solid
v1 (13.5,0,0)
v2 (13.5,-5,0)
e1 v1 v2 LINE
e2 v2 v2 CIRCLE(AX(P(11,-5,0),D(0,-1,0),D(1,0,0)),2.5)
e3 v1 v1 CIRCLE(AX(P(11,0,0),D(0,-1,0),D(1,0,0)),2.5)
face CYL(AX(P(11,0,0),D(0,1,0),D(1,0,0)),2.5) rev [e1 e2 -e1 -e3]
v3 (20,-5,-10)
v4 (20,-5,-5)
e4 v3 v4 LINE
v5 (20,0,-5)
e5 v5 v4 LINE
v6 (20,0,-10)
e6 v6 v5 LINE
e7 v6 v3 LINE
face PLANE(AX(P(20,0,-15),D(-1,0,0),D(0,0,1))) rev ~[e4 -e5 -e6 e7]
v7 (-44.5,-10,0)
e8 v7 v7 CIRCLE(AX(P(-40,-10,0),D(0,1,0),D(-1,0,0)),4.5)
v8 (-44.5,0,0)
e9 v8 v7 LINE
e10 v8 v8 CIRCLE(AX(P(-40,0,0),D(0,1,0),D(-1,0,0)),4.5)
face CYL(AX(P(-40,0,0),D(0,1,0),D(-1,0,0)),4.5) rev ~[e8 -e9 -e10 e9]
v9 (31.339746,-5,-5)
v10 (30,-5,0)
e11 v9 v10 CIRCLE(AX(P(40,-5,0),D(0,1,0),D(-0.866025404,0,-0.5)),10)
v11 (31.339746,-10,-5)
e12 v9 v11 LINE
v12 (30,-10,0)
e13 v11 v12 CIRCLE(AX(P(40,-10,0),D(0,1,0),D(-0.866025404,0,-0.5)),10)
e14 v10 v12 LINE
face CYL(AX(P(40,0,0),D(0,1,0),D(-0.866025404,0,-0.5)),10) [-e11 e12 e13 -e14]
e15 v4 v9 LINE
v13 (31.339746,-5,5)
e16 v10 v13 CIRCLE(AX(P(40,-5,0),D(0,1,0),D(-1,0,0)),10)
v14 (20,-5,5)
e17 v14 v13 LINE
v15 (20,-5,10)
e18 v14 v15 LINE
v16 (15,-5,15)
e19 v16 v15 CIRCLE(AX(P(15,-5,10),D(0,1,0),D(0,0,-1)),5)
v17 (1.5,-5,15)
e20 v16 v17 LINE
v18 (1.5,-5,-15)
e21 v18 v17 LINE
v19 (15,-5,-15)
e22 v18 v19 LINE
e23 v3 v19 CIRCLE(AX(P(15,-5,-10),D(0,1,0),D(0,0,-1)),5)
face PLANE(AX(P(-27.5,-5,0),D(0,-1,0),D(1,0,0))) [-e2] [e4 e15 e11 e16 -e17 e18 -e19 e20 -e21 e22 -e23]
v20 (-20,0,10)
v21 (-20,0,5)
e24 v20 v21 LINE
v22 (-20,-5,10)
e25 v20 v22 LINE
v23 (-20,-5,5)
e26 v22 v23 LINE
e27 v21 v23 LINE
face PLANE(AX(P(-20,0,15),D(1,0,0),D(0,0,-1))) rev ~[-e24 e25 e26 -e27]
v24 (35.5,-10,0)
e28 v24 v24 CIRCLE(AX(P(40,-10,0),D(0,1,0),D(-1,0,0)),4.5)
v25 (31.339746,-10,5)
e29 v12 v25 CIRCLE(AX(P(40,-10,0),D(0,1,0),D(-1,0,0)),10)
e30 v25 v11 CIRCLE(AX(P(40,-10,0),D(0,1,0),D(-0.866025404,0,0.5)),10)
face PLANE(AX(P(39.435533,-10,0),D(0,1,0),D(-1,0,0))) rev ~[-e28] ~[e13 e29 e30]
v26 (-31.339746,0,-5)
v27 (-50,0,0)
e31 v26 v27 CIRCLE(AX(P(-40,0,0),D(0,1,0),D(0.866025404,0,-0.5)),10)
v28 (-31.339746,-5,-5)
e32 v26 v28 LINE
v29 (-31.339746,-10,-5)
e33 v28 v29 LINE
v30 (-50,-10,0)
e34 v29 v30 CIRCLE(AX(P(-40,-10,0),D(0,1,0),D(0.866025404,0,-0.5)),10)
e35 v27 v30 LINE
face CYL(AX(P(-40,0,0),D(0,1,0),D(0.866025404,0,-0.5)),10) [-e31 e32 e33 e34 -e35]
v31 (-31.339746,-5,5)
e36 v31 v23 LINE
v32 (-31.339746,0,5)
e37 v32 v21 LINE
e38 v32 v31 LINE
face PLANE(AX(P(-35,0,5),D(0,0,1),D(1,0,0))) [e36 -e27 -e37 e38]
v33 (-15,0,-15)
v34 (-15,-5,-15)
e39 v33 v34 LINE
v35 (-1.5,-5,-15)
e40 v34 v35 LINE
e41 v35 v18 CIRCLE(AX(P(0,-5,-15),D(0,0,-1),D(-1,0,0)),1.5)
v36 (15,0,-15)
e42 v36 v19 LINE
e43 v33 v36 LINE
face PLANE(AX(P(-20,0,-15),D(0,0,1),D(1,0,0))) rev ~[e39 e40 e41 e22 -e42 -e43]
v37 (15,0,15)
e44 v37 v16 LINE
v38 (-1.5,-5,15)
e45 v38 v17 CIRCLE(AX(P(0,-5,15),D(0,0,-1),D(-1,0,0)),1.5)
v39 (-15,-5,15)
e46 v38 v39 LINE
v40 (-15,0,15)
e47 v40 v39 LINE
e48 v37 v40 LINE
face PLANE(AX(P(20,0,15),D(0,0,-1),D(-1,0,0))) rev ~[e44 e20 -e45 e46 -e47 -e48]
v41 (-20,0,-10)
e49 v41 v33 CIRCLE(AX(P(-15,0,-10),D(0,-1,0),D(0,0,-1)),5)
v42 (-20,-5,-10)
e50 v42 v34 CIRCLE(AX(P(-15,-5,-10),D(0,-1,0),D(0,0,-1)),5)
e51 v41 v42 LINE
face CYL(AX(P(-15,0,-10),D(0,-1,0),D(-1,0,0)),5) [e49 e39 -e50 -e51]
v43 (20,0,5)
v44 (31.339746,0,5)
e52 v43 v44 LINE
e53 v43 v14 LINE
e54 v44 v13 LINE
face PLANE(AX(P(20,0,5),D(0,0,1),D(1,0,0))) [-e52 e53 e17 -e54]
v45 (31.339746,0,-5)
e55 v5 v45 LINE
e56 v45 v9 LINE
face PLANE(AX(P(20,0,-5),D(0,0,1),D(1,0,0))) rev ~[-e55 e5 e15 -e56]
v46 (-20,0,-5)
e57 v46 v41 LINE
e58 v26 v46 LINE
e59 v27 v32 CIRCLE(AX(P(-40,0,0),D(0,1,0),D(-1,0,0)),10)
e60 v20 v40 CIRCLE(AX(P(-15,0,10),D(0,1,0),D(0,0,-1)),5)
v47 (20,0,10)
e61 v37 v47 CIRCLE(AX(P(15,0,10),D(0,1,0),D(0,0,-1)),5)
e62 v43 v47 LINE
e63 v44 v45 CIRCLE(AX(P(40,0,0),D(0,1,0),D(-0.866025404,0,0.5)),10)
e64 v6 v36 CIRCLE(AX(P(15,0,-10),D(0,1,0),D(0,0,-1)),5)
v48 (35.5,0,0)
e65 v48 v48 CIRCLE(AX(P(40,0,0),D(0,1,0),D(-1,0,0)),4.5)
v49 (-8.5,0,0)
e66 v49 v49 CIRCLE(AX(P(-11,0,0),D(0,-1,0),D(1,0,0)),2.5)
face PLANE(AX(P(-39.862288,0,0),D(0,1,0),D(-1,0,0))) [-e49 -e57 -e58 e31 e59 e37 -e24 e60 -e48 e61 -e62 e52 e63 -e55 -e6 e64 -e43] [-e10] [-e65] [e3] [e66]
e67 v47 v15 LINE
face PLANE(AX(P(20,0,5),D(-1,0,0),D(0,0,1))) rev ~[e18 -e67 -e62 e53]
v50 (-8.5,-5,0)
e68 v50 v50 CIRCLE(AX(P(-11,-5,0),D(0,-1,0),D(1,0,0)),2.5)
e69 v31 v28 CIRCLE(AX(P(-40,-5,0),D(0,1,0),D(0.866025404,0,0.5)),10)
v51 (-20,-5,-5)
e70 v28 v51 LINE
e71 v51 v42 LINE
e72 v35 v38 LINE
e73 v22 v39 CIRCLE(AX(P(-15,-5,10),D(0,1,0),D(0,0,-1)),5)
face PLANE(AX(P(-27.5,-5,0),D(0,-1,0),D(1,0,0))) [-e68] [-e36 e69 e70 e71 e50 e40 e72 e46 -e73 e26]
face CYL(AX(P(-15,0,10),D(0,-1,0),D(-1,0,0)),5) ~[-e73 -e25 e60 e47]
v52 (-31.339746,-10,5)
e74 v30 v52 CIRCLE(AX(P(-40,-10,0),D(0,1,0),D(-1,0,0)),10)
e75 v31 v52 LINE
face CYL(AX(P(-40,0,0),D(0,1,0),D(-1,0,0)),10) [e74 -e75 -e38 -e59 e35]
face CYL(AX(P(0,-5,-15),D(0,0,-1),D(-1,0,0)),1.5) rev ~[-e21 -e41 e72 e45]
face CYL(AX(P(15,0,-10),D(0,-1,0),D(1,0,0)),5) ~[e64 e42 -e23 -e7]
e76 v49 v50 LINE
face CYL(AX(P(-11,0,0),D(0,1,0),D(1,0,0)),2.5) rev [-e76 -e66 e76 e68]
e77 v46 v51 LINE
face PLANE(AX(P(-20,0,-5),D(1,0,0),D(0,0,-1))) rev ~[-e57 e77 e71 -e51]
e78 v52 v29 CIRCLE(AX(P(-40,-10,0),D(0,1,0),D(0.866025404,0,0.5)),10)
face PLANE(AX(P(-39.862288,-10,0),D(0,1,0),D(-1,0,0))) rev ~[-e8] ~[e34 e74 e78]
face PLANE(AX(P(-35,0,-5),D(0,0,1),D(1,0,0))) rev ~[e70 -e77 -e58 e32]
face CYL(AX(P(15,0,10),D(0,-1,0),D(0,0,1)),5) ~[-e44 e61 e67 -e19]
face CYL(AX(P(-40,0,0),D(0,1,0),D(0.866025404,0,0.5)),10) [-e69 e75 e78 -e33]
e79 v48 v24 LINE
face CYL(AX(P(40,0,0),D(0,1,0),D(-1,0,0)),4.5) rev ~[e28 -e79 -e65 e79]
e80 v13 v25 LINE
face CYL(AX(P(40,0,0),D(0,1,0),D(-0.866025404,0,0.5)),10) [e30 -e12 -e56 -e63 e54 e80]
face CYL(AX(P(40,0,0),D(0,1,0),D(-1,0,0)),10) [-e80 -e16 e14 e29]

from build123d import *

# Parameters (mm, degrees)
F0_W     = 15
F0_H     = 10
F0_R     = 2.5
F1_DEPTH = 5
F3_DEPTH = 31
F4_R     = 4.5
F5_DEPTH = 10
F6_R     = 5


# Not quite as in the source:
# - a feature names something its author has since deleted; it is built from what else it names


with BuildPart() as f1:
    # F0 (on Front) → F1 (new body)
    with BuildSketch(Plane.XZ):
        with Locations((-27.5, 0)):
            Rectangle(F0_W, F0_H)
        Polygon((20, 15), (-20, 15), (-20, 5), (-20, -5), (-20, -15), (20, -15), (20, -5), (20, 5), align=None)
        with Locations((-11, 0)):
            Circle(F0_R, mode=Mode.SUBTRACT)
        with Locations((11, 0)):
            Circle(F0_R, mode=Mode.SUBTRACT)
        with Locations((27.5, 0)):
            Rectangle(F0_W, F0_H)
    extrude(amount=F1_DEPTH)

    # F2 (on face) → F3 (cut)
    with BuildSketch(Plane(origin=(0, 0, -15), x_dir=(1, 0, 0), z_dir=(0, 0, -1))):
        with BuildLine():
            ThreePointArc((-1.5, 5), (0, 3.5), (1.5, 5))
            Line((1.5, 5), (-1.5, 5))
        make_face()
    extrude(amount=-F3_DEPTH, mode=Mode.SUBTRACT)

    # F4 (on face) → F5 (join)
    with BuildSketch(Plane(origin=(0, 0, 0), x_dir=(-1, 0, 0), z_dir=(0, 1, 0))):
        with BuildLine():
            ThreePointArc((50, 0), (42.588190451, 9.6592582629), (31.3397459622, 5))
            Line((31.3397459622, 5), (35, 5))
            Line((35, 5), (35, -5))
            Line((35, -5), (31.3397459622, -5))
            ThreePointArc((31.3397459622, -5), (42.588190451, -9.6592582629), (50, 0))
        make_face()
        with Locations((40, 0)):
            Circle(F4_R, mode=Mode.SUBTRACT)
        with BuildLine():
            Line((-35, 5), (-31.3397459622, 5))
            ThreePointArc((-31.3397459622, 5), (-50, 0), (-31.3397459622, -5))
            Line((-31.3397459622, -5), (-35, -5))
            Line((-35, -5), (-35, 5))
        make_face()
        with Locations((-40, 0)):
            Circle(F4_R, mode=Mode.SUBTRACT)
        with BuildLine():
            ThreePointArc((-31.3397459622, -5), (-30.3407417371, -2.588190451), (-30, 0))
            ThreePointArc((-30, 0), (-30.3407417371, 2.588190451), (-31.3397459622, 5))
            Line((-31.3397459622, 5), (-35, 5))
            Line((-35, 5), (-35, -5))
            Line((-35, -5), (-31.3397459622, -5))
        make_face()
        with BuildLine():
            Line((35, 5), (31.3397459622, 5))
            ThreePointArc((31.3397459622, 5), (30, 0), (31.3397459622, -5))
            Line((31.3397459622, -5), (35, -5))
            Line((35, -5), (35, 5))
        make_face()
    extrude(amount=-F5_DEPTH)

    # F6
    f6_edges = [f1.edges().sort_by_distance(p)[0] for p in [
        (20, -2.5, -15),
        (20, -2.5, 15),
        (-20, -2.5, 15),
        (-20, -2.5, -15),
    ]]
    fillet(f6_edges, radius=F6_R)


solid = f1.part
